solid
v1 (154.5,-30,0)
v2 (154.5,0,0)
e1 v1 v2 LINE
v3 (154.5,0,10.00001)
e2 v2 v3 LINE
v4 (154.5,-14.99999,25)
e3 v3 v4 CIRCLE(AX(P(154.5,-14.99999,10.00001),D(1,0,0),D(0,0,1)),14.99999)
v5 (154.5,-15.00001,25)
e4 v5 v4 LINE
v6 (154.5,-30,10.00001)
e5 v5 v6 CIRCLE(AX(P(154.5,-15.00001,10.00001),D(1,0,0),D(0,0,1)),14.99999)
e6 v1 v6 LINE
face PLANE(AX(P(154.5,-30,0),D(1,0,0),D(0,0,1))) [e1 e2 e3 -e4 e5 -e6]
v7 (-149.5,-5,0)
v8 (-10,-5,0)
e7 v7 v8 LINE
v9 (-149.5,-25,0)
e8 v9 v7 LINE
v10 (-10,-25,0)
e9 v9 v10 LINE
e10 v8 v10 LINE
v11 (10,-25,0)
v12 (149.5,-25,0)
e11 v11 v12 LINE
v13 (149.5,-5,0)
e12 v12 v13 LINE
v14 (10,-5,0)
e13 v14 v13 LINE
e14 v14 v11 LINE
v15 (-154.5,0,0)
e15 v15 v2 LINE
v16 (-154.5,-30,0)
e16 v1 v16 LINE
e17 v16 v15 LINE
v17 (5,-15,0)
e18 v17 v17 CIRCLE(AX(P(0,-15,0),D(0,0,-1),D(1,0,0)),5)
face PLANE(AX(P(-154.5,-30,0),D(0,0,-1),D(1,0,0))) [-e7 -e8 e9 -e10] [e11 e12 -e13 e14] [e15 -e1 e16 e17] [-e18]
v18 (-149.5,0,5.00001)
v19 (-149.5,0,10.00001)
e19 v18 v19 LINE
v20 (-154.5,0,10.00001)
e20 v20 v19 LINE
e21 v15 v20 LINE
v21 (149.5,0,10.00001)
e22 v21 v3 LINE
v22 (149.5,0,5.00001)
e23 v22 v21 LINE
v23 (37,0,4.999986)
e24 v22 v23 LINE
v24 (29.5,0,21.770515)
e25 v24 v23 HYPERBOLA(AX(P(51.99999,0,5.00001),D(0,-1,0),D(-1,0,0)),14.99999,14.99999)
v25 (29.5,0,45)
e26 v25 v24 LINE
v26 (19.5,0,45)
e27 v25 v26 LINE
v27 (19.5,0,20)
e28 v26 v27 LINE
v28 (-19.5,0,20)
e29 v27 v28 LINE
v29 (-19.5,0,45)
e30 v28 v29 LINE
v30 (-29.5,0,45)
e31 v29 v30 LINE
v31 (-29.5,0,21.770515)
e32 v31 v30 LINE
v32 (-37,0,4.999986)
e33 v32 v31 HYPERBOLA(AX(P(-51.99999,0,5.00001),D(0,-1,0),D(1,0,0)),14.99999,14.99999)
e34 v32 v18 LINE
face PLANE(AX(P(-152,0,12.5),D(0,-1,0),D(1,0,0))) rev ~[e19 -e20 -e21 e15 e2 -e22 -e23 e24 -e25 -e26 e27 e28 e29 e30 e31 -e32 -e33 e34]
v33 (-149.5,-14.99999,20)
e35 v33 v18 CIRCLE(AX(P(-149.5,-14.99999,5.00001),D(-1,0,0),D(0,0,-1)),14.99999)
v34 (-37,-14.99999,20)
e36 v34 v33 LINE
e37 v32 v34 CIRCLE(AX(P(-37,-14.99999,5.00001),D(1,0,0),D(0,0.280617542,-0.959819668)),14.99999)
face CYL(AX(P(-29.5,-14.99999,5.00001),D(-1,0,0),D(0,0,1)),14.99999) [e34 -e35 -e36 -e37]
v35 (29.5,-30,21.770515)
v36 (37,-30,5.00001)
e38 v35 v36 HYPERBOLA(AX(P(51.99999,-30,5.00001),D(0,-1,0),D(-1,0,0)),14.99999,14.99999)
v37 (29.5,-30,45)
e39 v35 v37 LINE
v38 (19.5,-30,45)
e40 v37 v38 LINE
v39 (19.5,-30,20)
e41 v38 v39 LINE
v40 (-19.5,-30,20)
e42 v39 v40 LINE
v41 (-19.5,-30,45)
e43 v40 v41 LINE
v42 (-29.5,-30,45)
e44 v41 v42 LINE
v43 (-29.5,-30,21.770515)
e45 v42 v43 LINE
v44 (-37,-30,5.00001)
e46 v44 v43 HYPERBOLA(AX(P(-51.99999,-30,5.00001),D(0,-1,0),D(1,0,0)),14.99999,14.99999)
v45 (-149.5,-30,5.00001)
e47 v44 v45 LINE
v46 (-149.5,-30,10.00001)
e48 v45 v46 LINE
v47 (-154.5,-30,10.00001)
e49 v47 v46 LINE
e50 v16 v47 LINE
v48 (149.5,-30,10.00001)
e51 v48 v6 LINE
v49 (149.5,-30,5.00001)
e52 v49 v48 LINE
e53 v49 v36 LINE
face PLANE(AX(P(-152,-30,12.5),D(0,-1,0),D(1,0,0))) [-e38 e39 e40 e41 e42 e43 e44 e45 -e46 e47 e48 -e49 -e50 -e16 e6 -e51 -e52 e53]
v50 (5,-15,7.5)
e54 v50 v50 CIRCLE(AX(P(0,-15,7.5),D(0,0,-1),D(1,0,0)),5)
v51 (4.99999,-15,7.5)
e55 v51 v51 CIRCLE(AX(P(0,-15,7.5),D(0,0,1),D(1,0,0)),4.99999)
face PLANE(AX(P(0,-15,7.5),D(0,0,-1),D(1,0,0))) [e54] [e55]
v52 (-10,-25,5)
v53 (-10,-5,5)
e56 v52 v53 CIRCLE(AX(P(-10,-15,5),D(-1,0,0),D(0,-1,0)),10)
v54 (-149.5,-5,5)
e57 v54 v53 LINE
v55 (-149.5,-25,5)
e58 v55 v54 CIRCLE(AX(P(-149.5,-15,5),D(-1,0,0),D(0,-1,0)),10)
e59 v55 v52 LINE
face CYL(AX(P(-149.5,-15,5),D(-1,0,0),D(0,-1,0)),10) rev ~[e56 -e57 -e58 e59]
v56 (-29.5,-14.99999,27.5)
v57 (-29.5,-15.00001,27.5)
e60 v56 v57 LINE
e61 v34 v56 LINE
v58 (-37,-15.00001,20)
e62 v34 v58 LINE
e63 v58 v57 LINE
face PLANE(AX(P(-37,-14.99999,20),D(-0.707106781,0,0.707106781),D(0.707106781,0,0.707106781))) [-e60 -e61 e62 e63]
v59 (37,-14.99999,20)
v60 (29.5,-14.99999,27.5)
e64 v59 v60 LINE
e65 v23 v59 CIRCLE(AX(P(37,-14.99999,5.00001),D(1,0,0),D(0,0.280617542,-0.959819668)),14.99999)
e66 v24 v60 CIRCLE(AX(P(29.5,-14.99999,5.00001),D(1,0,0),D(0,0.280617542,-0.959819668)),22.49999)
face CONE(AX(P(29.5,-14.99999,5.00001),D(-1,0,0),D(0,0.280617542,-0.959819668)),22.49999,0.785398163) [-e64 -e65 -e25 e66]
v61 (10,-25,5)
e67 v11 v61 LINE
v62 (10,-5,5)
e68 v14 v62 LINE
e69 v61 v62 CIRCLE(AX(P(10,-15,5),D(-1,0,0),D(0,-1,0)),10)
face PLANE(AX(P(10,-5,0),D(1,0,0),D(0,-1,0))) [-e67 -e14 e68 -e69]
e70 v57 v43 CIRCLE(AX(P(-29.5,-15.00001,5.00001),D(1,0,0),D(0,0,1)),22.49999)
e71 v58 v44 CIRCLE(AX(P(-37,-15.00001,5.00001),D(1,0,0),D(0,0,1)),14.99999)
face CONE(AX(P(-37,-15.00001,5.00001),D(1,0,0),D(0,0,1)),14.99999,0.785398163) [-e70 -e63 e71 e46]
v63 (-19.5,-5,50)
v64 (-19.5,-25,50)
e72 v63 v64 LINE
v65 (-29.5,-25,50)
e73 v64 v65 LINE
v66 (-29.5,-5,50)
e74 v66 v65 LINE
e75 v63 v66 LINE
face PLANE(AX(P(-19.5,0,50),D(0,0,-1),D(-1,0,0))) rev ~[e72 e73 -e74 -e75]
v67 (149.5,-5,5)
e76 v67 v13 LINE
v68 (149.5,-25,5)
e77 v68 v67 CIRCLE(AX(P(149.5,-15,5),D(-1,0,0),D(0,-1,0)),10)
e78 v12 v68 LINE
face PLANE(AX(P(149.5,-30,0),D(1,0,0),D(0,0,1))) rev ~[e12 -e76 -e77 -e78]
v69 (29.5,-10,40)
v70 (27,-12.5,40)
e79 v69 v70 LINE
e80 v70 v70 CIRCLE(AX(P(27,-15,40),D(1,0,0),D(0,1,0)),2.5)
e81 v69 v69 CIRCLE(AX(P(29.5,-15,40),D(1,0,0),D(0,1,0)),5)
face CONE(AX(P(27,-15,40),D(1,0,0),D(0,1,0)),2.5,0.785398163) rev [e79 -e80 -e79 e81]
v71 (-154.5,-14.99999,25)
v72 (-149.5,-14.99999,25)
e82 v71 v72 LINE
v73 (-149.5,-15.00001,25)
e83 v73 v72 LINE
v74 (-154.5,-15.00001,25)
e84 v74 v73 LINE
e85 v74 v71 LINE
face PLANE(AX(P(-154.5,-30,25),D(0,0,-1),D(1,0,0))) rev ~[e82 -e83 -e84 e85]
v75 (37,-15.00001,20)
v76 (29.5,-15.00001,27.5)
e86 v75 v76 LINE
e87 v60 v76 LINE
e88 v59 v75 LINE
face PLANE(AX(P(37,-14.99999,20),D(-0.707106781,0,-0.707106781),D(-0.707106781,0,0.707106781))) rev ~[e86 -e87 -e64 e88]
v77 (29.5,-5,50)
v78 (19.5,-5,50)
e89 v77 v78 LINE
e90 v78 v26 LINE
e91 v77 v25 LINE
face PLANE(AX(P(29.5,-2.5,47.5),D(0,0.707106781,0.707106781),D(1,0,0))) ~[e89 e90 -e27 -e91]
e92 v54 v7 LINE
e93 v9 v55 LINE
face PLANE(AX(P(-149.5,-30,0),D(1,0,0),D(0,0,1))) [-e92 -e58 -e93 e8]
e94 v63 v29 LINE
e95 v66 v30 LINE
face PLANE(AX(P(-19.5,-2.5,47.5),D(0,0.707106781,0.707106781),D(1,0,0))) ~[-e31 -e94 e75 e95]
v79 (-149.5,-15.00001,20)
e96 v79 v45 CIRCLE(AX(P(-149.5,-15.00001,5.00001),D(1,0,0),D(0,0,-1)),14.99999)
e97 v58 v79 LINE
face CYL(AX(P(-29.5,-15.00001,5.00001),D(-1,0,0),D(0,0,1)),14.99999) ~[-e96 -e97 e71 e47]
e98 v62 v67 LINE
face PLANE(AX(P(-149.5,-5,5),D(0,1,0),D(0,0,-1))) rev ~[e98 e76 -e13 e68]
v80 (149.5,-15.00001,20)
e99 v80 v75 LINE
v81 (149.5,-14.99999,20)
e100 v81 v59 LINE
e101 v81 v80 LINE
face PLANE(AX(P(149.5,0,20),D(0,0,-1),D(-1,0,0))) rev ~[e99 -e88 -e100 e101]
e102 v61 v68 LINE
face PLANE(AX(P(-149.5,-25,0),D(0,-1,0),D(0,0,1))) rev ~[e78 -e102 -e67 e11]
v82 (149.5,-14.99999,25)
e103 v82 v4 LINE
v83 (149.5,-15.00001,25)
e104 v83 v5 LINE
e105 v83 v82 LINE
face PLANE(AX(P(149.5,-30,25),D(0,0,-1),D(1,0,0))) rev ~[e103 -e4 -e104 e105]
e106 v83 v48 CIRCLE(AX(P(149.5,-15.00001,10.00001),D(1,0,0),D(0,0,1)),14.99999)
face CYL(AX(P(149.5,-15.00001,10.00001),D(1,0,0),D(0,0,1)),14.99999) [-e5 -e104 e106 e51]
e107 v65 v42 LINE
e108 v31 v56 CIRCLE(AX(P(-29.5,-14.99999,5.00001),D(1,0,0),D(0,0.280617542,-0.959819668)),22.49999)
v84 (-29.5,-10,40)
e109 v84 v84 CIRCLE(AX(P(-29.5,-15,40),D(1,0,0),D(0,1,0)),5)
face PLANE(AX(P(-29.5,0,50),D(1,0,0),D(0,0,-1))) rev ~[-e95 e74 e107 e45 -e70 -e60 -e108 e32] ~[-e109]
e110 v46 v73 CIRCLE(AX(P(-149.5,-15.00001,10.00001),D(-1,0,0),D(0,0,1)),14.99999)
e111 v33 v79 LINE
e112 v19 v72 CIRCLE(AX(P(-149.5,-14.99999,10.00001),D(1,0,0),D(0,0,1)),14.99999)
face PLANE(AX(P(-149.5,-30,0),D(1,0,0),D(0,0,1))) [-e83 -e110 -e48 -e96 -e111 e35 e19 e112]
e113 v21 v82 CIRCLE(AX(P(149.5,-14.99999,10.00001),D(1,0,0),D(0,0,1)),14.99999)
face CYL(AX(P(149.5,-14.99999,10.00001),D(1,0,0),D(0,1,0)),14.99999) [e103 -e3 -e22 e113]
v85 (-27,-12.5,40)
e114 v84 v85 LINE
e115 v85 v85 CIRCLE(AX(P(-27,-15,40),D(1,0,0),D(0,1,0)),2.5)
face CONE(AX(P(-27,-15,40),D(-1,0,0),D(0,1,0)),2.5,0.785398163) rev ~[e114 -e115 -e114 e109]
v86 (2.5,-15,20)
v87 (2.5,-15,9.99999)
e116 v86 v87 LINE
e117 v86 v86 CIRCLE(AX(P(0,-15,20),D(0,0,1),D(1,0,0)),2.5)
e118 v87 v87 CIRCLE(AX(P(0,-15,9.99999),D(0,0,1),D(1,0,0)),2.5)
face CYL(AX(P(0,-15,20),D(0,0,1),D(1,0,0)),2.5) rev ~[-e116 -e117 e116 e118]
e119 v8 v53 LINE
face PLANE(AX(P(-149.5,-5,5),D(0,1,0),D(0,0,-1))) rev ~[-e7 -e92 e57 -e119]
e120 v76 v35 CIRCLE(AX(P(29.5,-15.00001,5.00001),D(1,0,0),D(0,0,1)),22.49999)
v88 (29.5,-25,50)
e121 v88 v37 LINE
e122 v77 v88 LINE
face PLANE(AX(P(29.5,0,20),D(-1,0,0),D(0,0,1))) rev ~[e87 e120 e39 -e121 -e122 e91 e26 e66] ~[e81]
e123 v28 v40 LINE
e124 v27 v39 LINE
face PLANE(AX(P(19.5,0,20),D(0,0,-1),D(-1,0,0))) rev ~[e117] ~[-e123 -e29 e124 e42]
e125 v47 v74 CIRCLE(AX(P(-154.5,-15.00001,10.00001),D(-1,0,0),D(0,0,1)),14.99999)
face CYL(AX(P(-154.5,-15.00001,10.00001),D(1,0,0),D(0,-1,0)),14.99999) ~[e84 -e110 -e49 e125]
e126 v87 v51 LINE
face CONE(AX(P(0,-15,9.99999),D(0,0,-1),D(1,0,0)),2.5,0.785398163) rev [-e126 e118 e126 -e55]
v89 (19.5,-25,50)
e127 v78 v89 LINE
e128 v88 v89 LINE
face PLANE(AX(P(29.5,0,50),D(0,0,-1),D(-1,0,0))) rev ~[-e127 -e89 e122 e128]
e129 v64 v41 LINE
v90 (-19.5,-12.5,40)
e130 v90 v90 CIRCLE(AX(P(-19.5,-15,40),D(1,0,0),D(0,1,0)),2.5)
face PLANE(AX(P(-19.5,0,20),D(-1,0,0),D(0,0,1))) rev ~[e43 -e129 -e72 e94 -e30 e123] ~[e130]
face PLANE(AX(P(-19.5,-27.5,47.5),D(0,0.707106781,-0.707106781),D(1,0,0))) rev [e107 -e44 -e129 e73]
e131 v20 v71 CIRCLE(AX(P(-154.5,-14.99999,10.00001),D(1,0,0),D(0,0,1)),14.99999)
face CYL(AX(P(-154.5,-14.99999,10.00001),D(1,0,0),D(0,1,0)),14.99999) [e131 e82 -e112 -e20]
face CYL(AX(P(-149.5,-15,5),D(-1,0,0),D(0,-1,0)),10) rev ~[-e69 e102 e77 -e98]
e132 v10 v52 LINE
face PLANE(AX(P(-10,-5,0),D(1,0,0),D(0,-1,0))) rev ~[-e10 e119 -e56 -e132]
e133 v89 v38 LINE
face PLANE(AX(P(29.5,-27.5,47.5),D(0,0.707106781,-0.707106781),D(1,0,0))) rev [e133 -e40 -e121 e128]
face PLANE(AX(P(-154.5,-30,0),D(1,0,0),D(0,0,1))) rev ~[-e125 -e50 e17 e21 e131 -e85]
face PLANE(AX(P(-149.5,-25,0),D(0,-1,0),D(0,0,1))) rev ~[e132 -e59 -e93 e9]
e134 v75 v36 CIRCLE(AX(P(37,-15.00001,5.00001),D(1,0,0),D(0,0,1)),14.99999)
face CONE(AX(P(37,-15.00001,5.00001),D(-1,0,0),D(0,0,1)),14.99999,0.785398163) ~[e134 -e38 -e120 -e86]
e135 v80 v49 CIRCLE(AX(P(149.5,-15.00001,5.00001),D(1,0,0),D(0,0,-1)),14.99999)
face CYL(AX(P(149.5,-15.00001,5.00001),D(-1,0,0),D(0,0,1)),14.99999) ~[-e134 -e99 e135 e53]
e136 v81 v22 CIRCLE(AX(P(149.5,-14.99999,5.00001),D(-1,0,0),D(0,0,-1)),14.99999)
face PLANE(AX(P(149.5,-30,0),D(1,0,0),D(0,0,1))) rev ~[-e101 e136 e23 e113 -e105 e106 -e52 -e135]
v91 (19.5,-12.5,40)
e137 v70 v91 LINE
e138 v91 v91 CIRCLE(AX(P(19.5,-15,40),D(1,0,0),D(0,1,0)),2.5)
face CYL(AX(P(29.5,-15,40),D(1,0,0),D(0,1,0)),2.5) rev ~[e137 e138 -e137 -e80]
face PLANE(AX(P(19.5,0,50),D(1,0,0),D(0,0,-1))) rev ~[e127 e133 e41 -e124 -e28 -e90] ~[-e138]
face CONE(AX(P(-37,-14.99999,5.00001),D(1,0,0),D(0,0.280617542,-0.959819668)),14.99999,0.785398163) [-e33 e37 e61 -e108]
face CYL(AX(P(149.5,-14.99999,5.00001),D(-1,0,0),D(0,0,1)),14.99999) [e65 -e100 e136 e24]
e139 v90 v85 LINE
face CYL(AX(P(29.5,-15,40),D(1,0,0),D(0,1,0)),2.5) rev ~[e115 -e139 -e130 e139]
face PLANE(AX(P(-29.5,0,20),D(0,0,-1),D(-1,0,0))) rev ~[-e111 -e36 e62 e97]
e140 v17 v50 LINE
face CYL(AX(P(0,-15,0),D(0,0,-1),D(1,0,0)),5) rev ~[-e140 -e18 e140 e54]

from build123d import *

# Parameters (mm, degrees)
F1_DEPTH     = 30
F2_R         = 14.99999
F4_DEPTH     = 299.001
F5_T1_DEPTH  = 2e-05
F5_T6_ANGLE  = 163.702935025
F5_T12_ANGLE = 163.702935025
F5_T18_ANGLE = 163.702935025
F5_T24_ANGLE = 163.702935025
F6_SIZE      = 5
F7_R         = 2.5
F8_DEPTH     = 179.001
F9_W         = 20
F9_H         = 20
F11_R        = 2.5
F12_DEPTH    = 20.001
F13_SIZE     = 2.5
F14_W        = 5
F14_H        = 25
F15_DEPTH    = 30
F16_R        = 14.99999
F17_R        = 5
F18_DEPTH    = 7.5
F19_SIZE     = 2.49999


# Not quite as in the source:
# - a fillet or chamfer that OpenCascade refuses, or shapes differently, is made with other operations: its cross-section is extruded or revolved along the edge and cut away or added
# - a fillet or chamfer is up to 0.001 mm smaller than in the source, because OpenCascade refuses the exact size


with BuildPart() as f1:
    # F0 (on Front) → F1 (new body)
    with BuildSketch(Plane.XZ):
        Polygon((-149.5, 0), (0, 0), (149.5, 0), (149.5, 20), (29.5, 20), (29.5, 50), (19.5, 50), (19.5, 20), (0, 20), (-19.5, 20), (-19.5, 50), (-29.5, 50), (-29.5, 20), (-149.5, 20), align=None)
    extrude(amount=F1_DEPTH)

    # F2 (radius 15 in the source; OpenCascade refuses exactly that, so slightly less here)
    f2_edges = [f1.edges().sort_by_distance(p)[0] for p in [
        (-89.5, 0, 20),
        (-89.5, -30, 20),
        (89.5, 0, 20),
        (89.5, -30, 20),
    ]]
    fillet(f2_edges, radius=F2_R)

    # F3 (on face) → F4 (cut, through all)
    with BuildSketch(Plane(origin=(-149.5, 0, 0), x_dir=(0, -1, 0), z_dir=(-1, 0, 0))):
        with BuildLine():
            Line((25, 0), (25, 5))
            ThreePointArc((25, 5), (15, 15), (5, 5))
            Line((5, 5), (5, 0))
            Line((5, 0), (25, 0))
        make_face()
    extrude(amount=-F4_DEPTH, mode=Mode.SUBTRACT)

    # F5: chamfer of 7.5 on 4 edges, made by hand

    # F5_s2 → F5_t1 (join)
    with BuildSketch(Plane.XZ.offset(14.99999)):
        Polygon((-37, 20), (-29.5, 27.5), (-29.5, 20), align=None)
        Polygon((37, 20), (29.5, 27.5), (29.5, 20), align=None)
    extrude(amount=F5_T1_DEPTH)


with BuildPart() as f5_tool4:
    # F5_s5 → F5_t6 (revolve)
    with BuildSketch(Plane(origin=(0, -12.4720838446, -3.6463990318), x_dir=(1, 0, 0), z_dir=(0, -0.9598196681, -0.2806175417))):
        Polygon((-37, -5.9916217418), (-29.5, -13.4916217418), (-29.5, -5.9916217418), align=None)
    revolve(axis=Axis((-29.5, -14.99999, 5.00001), (1, 0, 0)), revolution_arc=F5_T6_ANGLE)

    split(bisect_by=Plane.XZ, keep=Keep.TOP)

    split(bisect_by=Plane.XY, keep=Keep.TOP)


with BuildPart() as f1_1:
    add(f1.part)

    # F5_t3: union F5_tool4
    add(f5_tool4.part)


with BuildPart() as f5_tool10:
    # F5_s11 → F5_t12 (revolve)
    with BuildSketch(Plane(origin=(0, -12.4720838446, -3.6463990318), x_dir=(1, 0, 0), z_dir=(0, -0.9598196681, -0.2806175417))):
        Polygon((29.5, -13.4916217418), (37, -5.9916217418), (29.5, -5.9916217418), align=None)
    revolve(axis=Axis((29.5, -14.99999, 5.00001), (1, 0, 0)), revolution_arc=F5_T12_ANGLE)

    split(bisect_by=Plane.XZ, keep=Keep.TOP)

    split(bisect_by=Plane.XY, keep=Keep.TOP)


with BuildPart() as f1_2:
    add(f1_1.part)

    # F5_t9: union F5_tool10
    add(f5_tool10.part)


with BuildPart() as f5_tool16:
    # F5_s17 → F5_t18 (revolve)
    with BuildSketch(Plane.XZ.offset(15.00001)):
        Polygon((37, 20), (29.5, 27.5), (29.5, 20), align=None)
    revolve(axis=Axis((29.5, -15.00001, 5.00001), (1, 0, 0)), revolution_arc=F5_T18_ANGLE)

    split(bisect_by=Plane.XY, keep=Keep.TOP)

    split(bisect_by=Plane.XZ.offset(30), keep=Keep.BOTTOM)


with BuildPart() as f1_3:
    add(f1_2.part)

    # F5_t15: union F5_tool16
    add(f5_tool16.part)


with BuildPart() as f5_tool22:
    # F5_s23 → F5_t24 (revolve)
    with BuildSketch(Plane.XZ.offset(15.00001)):
        Polygon((-37, 20), (-29.5, 27.5), (-29.5, 20), align=None)
    revolve(axis=Axis((-29.5, -15.00001, 5.00001), (1, 0, 0)), revolution_arc=F5_T24_ANGLE)

    split(bisect_by=Plane.XY, keep=Keep.TOP)

    split(bisect_by=Plane.XZ.offset(30), keep=Keep.BOTTOM)


with BuildPart() as f1_4:
    add(f1_3.part)

    # F5_t21: union F5_tool22
    add(f5_tool22.part)

    # F6
    f6_edges = [f1_4.edges().sort_by_distance(p)[0] for p in [
        (-24.5, 0, 50),
        (-24.5, -30, 50),
        (24.5, 0, 50),
        (24.5, -30, 50),
    ]]
    chamfer(f6_edges, length=F6_SIZE)

    # F7 (on face) → F8 (cut, through all)
    with BuildSketch(Plane.YZ.offset(29.5)):
        with Locations((-15, 40)):
            Circle(F7_R)
    extrude(amount=-F8_DEPTH, mode=Mode.SUBTRACT)

    # F9 (on face) → F10 (join, up to the next surface of F1)
    with BuildSketch(Plane(origin=(0, 0, 0), x_dir=(1, 0, 0), z_dir=(0, 0, -1))):
        with Locations((0, 15)):
            Rectangle(F9_W, F9_H)
    extrude(until=Until.NEXT, dir=(0, 0, 1))

    # F11 (on face) → F12 (cut, through all)
    with BuildSketch(Plane.XY.offset(20)):
        with Locations((0, -15)):
            Circle(F11_R)
    extrude(amount=-F12_DEPTH, mode=Mode.SUBTRACT)

    # F13
    f13_edges = [f1_4.edges().sort_by_distance(p)[0] for p in [
        (-29.5, -17.5, 40),
        (29.5, -17.5, 40),
    ]]
    chamfer(f13_edges, length=F13_SIZE)

    # F14 (on face) → F15 (join, through all)
    with BuildSketch(Plane.XZ.offset(30)):
        with Locations((-152, 12.5)):
            Rectangle(F14_W, F14_H)
        with Locations((152, 12.5)):
            Rectangle(F14_W, F14_H)
    extrude(amount=-F15_DEPTH)

    # F16 (radius 15 in the source; OpenCascade refuses exactly that, so slightly less here)
    f16_edges = [f1_4.edges().sort_by_distance(p)[0] for p in [
        (152, 0, 25),
        (152, -30, 25),
        (-152, -30, 25),
        (-152, 0, 25),
    ]]
    fillet(f16_edges, radius=F16_R)

    # F17 (on face) → F18 (cut)
    with BuildSketch(Plane(origin=(0, 0, 0), x_dir=(1, 0, 0), z_dir=(0, 0, -1))):
        with Locations((0, 15)):
            Circle(F17_R)
    extrude(amount=-F18_DEPTH, mode=Mode.SUBTRACT)

    # F19 (size 2.5 in the source; OpenCascade refuses exactly that, so slightly less here)
    f19_edges = [f1_4.edges().sort_by_distance(p)[0] for p in [
        (-2.5, -15, 7.5),
    ]]
    chamfer(f19_edges, length=F19_SIZE)


solid = f1_4.part
